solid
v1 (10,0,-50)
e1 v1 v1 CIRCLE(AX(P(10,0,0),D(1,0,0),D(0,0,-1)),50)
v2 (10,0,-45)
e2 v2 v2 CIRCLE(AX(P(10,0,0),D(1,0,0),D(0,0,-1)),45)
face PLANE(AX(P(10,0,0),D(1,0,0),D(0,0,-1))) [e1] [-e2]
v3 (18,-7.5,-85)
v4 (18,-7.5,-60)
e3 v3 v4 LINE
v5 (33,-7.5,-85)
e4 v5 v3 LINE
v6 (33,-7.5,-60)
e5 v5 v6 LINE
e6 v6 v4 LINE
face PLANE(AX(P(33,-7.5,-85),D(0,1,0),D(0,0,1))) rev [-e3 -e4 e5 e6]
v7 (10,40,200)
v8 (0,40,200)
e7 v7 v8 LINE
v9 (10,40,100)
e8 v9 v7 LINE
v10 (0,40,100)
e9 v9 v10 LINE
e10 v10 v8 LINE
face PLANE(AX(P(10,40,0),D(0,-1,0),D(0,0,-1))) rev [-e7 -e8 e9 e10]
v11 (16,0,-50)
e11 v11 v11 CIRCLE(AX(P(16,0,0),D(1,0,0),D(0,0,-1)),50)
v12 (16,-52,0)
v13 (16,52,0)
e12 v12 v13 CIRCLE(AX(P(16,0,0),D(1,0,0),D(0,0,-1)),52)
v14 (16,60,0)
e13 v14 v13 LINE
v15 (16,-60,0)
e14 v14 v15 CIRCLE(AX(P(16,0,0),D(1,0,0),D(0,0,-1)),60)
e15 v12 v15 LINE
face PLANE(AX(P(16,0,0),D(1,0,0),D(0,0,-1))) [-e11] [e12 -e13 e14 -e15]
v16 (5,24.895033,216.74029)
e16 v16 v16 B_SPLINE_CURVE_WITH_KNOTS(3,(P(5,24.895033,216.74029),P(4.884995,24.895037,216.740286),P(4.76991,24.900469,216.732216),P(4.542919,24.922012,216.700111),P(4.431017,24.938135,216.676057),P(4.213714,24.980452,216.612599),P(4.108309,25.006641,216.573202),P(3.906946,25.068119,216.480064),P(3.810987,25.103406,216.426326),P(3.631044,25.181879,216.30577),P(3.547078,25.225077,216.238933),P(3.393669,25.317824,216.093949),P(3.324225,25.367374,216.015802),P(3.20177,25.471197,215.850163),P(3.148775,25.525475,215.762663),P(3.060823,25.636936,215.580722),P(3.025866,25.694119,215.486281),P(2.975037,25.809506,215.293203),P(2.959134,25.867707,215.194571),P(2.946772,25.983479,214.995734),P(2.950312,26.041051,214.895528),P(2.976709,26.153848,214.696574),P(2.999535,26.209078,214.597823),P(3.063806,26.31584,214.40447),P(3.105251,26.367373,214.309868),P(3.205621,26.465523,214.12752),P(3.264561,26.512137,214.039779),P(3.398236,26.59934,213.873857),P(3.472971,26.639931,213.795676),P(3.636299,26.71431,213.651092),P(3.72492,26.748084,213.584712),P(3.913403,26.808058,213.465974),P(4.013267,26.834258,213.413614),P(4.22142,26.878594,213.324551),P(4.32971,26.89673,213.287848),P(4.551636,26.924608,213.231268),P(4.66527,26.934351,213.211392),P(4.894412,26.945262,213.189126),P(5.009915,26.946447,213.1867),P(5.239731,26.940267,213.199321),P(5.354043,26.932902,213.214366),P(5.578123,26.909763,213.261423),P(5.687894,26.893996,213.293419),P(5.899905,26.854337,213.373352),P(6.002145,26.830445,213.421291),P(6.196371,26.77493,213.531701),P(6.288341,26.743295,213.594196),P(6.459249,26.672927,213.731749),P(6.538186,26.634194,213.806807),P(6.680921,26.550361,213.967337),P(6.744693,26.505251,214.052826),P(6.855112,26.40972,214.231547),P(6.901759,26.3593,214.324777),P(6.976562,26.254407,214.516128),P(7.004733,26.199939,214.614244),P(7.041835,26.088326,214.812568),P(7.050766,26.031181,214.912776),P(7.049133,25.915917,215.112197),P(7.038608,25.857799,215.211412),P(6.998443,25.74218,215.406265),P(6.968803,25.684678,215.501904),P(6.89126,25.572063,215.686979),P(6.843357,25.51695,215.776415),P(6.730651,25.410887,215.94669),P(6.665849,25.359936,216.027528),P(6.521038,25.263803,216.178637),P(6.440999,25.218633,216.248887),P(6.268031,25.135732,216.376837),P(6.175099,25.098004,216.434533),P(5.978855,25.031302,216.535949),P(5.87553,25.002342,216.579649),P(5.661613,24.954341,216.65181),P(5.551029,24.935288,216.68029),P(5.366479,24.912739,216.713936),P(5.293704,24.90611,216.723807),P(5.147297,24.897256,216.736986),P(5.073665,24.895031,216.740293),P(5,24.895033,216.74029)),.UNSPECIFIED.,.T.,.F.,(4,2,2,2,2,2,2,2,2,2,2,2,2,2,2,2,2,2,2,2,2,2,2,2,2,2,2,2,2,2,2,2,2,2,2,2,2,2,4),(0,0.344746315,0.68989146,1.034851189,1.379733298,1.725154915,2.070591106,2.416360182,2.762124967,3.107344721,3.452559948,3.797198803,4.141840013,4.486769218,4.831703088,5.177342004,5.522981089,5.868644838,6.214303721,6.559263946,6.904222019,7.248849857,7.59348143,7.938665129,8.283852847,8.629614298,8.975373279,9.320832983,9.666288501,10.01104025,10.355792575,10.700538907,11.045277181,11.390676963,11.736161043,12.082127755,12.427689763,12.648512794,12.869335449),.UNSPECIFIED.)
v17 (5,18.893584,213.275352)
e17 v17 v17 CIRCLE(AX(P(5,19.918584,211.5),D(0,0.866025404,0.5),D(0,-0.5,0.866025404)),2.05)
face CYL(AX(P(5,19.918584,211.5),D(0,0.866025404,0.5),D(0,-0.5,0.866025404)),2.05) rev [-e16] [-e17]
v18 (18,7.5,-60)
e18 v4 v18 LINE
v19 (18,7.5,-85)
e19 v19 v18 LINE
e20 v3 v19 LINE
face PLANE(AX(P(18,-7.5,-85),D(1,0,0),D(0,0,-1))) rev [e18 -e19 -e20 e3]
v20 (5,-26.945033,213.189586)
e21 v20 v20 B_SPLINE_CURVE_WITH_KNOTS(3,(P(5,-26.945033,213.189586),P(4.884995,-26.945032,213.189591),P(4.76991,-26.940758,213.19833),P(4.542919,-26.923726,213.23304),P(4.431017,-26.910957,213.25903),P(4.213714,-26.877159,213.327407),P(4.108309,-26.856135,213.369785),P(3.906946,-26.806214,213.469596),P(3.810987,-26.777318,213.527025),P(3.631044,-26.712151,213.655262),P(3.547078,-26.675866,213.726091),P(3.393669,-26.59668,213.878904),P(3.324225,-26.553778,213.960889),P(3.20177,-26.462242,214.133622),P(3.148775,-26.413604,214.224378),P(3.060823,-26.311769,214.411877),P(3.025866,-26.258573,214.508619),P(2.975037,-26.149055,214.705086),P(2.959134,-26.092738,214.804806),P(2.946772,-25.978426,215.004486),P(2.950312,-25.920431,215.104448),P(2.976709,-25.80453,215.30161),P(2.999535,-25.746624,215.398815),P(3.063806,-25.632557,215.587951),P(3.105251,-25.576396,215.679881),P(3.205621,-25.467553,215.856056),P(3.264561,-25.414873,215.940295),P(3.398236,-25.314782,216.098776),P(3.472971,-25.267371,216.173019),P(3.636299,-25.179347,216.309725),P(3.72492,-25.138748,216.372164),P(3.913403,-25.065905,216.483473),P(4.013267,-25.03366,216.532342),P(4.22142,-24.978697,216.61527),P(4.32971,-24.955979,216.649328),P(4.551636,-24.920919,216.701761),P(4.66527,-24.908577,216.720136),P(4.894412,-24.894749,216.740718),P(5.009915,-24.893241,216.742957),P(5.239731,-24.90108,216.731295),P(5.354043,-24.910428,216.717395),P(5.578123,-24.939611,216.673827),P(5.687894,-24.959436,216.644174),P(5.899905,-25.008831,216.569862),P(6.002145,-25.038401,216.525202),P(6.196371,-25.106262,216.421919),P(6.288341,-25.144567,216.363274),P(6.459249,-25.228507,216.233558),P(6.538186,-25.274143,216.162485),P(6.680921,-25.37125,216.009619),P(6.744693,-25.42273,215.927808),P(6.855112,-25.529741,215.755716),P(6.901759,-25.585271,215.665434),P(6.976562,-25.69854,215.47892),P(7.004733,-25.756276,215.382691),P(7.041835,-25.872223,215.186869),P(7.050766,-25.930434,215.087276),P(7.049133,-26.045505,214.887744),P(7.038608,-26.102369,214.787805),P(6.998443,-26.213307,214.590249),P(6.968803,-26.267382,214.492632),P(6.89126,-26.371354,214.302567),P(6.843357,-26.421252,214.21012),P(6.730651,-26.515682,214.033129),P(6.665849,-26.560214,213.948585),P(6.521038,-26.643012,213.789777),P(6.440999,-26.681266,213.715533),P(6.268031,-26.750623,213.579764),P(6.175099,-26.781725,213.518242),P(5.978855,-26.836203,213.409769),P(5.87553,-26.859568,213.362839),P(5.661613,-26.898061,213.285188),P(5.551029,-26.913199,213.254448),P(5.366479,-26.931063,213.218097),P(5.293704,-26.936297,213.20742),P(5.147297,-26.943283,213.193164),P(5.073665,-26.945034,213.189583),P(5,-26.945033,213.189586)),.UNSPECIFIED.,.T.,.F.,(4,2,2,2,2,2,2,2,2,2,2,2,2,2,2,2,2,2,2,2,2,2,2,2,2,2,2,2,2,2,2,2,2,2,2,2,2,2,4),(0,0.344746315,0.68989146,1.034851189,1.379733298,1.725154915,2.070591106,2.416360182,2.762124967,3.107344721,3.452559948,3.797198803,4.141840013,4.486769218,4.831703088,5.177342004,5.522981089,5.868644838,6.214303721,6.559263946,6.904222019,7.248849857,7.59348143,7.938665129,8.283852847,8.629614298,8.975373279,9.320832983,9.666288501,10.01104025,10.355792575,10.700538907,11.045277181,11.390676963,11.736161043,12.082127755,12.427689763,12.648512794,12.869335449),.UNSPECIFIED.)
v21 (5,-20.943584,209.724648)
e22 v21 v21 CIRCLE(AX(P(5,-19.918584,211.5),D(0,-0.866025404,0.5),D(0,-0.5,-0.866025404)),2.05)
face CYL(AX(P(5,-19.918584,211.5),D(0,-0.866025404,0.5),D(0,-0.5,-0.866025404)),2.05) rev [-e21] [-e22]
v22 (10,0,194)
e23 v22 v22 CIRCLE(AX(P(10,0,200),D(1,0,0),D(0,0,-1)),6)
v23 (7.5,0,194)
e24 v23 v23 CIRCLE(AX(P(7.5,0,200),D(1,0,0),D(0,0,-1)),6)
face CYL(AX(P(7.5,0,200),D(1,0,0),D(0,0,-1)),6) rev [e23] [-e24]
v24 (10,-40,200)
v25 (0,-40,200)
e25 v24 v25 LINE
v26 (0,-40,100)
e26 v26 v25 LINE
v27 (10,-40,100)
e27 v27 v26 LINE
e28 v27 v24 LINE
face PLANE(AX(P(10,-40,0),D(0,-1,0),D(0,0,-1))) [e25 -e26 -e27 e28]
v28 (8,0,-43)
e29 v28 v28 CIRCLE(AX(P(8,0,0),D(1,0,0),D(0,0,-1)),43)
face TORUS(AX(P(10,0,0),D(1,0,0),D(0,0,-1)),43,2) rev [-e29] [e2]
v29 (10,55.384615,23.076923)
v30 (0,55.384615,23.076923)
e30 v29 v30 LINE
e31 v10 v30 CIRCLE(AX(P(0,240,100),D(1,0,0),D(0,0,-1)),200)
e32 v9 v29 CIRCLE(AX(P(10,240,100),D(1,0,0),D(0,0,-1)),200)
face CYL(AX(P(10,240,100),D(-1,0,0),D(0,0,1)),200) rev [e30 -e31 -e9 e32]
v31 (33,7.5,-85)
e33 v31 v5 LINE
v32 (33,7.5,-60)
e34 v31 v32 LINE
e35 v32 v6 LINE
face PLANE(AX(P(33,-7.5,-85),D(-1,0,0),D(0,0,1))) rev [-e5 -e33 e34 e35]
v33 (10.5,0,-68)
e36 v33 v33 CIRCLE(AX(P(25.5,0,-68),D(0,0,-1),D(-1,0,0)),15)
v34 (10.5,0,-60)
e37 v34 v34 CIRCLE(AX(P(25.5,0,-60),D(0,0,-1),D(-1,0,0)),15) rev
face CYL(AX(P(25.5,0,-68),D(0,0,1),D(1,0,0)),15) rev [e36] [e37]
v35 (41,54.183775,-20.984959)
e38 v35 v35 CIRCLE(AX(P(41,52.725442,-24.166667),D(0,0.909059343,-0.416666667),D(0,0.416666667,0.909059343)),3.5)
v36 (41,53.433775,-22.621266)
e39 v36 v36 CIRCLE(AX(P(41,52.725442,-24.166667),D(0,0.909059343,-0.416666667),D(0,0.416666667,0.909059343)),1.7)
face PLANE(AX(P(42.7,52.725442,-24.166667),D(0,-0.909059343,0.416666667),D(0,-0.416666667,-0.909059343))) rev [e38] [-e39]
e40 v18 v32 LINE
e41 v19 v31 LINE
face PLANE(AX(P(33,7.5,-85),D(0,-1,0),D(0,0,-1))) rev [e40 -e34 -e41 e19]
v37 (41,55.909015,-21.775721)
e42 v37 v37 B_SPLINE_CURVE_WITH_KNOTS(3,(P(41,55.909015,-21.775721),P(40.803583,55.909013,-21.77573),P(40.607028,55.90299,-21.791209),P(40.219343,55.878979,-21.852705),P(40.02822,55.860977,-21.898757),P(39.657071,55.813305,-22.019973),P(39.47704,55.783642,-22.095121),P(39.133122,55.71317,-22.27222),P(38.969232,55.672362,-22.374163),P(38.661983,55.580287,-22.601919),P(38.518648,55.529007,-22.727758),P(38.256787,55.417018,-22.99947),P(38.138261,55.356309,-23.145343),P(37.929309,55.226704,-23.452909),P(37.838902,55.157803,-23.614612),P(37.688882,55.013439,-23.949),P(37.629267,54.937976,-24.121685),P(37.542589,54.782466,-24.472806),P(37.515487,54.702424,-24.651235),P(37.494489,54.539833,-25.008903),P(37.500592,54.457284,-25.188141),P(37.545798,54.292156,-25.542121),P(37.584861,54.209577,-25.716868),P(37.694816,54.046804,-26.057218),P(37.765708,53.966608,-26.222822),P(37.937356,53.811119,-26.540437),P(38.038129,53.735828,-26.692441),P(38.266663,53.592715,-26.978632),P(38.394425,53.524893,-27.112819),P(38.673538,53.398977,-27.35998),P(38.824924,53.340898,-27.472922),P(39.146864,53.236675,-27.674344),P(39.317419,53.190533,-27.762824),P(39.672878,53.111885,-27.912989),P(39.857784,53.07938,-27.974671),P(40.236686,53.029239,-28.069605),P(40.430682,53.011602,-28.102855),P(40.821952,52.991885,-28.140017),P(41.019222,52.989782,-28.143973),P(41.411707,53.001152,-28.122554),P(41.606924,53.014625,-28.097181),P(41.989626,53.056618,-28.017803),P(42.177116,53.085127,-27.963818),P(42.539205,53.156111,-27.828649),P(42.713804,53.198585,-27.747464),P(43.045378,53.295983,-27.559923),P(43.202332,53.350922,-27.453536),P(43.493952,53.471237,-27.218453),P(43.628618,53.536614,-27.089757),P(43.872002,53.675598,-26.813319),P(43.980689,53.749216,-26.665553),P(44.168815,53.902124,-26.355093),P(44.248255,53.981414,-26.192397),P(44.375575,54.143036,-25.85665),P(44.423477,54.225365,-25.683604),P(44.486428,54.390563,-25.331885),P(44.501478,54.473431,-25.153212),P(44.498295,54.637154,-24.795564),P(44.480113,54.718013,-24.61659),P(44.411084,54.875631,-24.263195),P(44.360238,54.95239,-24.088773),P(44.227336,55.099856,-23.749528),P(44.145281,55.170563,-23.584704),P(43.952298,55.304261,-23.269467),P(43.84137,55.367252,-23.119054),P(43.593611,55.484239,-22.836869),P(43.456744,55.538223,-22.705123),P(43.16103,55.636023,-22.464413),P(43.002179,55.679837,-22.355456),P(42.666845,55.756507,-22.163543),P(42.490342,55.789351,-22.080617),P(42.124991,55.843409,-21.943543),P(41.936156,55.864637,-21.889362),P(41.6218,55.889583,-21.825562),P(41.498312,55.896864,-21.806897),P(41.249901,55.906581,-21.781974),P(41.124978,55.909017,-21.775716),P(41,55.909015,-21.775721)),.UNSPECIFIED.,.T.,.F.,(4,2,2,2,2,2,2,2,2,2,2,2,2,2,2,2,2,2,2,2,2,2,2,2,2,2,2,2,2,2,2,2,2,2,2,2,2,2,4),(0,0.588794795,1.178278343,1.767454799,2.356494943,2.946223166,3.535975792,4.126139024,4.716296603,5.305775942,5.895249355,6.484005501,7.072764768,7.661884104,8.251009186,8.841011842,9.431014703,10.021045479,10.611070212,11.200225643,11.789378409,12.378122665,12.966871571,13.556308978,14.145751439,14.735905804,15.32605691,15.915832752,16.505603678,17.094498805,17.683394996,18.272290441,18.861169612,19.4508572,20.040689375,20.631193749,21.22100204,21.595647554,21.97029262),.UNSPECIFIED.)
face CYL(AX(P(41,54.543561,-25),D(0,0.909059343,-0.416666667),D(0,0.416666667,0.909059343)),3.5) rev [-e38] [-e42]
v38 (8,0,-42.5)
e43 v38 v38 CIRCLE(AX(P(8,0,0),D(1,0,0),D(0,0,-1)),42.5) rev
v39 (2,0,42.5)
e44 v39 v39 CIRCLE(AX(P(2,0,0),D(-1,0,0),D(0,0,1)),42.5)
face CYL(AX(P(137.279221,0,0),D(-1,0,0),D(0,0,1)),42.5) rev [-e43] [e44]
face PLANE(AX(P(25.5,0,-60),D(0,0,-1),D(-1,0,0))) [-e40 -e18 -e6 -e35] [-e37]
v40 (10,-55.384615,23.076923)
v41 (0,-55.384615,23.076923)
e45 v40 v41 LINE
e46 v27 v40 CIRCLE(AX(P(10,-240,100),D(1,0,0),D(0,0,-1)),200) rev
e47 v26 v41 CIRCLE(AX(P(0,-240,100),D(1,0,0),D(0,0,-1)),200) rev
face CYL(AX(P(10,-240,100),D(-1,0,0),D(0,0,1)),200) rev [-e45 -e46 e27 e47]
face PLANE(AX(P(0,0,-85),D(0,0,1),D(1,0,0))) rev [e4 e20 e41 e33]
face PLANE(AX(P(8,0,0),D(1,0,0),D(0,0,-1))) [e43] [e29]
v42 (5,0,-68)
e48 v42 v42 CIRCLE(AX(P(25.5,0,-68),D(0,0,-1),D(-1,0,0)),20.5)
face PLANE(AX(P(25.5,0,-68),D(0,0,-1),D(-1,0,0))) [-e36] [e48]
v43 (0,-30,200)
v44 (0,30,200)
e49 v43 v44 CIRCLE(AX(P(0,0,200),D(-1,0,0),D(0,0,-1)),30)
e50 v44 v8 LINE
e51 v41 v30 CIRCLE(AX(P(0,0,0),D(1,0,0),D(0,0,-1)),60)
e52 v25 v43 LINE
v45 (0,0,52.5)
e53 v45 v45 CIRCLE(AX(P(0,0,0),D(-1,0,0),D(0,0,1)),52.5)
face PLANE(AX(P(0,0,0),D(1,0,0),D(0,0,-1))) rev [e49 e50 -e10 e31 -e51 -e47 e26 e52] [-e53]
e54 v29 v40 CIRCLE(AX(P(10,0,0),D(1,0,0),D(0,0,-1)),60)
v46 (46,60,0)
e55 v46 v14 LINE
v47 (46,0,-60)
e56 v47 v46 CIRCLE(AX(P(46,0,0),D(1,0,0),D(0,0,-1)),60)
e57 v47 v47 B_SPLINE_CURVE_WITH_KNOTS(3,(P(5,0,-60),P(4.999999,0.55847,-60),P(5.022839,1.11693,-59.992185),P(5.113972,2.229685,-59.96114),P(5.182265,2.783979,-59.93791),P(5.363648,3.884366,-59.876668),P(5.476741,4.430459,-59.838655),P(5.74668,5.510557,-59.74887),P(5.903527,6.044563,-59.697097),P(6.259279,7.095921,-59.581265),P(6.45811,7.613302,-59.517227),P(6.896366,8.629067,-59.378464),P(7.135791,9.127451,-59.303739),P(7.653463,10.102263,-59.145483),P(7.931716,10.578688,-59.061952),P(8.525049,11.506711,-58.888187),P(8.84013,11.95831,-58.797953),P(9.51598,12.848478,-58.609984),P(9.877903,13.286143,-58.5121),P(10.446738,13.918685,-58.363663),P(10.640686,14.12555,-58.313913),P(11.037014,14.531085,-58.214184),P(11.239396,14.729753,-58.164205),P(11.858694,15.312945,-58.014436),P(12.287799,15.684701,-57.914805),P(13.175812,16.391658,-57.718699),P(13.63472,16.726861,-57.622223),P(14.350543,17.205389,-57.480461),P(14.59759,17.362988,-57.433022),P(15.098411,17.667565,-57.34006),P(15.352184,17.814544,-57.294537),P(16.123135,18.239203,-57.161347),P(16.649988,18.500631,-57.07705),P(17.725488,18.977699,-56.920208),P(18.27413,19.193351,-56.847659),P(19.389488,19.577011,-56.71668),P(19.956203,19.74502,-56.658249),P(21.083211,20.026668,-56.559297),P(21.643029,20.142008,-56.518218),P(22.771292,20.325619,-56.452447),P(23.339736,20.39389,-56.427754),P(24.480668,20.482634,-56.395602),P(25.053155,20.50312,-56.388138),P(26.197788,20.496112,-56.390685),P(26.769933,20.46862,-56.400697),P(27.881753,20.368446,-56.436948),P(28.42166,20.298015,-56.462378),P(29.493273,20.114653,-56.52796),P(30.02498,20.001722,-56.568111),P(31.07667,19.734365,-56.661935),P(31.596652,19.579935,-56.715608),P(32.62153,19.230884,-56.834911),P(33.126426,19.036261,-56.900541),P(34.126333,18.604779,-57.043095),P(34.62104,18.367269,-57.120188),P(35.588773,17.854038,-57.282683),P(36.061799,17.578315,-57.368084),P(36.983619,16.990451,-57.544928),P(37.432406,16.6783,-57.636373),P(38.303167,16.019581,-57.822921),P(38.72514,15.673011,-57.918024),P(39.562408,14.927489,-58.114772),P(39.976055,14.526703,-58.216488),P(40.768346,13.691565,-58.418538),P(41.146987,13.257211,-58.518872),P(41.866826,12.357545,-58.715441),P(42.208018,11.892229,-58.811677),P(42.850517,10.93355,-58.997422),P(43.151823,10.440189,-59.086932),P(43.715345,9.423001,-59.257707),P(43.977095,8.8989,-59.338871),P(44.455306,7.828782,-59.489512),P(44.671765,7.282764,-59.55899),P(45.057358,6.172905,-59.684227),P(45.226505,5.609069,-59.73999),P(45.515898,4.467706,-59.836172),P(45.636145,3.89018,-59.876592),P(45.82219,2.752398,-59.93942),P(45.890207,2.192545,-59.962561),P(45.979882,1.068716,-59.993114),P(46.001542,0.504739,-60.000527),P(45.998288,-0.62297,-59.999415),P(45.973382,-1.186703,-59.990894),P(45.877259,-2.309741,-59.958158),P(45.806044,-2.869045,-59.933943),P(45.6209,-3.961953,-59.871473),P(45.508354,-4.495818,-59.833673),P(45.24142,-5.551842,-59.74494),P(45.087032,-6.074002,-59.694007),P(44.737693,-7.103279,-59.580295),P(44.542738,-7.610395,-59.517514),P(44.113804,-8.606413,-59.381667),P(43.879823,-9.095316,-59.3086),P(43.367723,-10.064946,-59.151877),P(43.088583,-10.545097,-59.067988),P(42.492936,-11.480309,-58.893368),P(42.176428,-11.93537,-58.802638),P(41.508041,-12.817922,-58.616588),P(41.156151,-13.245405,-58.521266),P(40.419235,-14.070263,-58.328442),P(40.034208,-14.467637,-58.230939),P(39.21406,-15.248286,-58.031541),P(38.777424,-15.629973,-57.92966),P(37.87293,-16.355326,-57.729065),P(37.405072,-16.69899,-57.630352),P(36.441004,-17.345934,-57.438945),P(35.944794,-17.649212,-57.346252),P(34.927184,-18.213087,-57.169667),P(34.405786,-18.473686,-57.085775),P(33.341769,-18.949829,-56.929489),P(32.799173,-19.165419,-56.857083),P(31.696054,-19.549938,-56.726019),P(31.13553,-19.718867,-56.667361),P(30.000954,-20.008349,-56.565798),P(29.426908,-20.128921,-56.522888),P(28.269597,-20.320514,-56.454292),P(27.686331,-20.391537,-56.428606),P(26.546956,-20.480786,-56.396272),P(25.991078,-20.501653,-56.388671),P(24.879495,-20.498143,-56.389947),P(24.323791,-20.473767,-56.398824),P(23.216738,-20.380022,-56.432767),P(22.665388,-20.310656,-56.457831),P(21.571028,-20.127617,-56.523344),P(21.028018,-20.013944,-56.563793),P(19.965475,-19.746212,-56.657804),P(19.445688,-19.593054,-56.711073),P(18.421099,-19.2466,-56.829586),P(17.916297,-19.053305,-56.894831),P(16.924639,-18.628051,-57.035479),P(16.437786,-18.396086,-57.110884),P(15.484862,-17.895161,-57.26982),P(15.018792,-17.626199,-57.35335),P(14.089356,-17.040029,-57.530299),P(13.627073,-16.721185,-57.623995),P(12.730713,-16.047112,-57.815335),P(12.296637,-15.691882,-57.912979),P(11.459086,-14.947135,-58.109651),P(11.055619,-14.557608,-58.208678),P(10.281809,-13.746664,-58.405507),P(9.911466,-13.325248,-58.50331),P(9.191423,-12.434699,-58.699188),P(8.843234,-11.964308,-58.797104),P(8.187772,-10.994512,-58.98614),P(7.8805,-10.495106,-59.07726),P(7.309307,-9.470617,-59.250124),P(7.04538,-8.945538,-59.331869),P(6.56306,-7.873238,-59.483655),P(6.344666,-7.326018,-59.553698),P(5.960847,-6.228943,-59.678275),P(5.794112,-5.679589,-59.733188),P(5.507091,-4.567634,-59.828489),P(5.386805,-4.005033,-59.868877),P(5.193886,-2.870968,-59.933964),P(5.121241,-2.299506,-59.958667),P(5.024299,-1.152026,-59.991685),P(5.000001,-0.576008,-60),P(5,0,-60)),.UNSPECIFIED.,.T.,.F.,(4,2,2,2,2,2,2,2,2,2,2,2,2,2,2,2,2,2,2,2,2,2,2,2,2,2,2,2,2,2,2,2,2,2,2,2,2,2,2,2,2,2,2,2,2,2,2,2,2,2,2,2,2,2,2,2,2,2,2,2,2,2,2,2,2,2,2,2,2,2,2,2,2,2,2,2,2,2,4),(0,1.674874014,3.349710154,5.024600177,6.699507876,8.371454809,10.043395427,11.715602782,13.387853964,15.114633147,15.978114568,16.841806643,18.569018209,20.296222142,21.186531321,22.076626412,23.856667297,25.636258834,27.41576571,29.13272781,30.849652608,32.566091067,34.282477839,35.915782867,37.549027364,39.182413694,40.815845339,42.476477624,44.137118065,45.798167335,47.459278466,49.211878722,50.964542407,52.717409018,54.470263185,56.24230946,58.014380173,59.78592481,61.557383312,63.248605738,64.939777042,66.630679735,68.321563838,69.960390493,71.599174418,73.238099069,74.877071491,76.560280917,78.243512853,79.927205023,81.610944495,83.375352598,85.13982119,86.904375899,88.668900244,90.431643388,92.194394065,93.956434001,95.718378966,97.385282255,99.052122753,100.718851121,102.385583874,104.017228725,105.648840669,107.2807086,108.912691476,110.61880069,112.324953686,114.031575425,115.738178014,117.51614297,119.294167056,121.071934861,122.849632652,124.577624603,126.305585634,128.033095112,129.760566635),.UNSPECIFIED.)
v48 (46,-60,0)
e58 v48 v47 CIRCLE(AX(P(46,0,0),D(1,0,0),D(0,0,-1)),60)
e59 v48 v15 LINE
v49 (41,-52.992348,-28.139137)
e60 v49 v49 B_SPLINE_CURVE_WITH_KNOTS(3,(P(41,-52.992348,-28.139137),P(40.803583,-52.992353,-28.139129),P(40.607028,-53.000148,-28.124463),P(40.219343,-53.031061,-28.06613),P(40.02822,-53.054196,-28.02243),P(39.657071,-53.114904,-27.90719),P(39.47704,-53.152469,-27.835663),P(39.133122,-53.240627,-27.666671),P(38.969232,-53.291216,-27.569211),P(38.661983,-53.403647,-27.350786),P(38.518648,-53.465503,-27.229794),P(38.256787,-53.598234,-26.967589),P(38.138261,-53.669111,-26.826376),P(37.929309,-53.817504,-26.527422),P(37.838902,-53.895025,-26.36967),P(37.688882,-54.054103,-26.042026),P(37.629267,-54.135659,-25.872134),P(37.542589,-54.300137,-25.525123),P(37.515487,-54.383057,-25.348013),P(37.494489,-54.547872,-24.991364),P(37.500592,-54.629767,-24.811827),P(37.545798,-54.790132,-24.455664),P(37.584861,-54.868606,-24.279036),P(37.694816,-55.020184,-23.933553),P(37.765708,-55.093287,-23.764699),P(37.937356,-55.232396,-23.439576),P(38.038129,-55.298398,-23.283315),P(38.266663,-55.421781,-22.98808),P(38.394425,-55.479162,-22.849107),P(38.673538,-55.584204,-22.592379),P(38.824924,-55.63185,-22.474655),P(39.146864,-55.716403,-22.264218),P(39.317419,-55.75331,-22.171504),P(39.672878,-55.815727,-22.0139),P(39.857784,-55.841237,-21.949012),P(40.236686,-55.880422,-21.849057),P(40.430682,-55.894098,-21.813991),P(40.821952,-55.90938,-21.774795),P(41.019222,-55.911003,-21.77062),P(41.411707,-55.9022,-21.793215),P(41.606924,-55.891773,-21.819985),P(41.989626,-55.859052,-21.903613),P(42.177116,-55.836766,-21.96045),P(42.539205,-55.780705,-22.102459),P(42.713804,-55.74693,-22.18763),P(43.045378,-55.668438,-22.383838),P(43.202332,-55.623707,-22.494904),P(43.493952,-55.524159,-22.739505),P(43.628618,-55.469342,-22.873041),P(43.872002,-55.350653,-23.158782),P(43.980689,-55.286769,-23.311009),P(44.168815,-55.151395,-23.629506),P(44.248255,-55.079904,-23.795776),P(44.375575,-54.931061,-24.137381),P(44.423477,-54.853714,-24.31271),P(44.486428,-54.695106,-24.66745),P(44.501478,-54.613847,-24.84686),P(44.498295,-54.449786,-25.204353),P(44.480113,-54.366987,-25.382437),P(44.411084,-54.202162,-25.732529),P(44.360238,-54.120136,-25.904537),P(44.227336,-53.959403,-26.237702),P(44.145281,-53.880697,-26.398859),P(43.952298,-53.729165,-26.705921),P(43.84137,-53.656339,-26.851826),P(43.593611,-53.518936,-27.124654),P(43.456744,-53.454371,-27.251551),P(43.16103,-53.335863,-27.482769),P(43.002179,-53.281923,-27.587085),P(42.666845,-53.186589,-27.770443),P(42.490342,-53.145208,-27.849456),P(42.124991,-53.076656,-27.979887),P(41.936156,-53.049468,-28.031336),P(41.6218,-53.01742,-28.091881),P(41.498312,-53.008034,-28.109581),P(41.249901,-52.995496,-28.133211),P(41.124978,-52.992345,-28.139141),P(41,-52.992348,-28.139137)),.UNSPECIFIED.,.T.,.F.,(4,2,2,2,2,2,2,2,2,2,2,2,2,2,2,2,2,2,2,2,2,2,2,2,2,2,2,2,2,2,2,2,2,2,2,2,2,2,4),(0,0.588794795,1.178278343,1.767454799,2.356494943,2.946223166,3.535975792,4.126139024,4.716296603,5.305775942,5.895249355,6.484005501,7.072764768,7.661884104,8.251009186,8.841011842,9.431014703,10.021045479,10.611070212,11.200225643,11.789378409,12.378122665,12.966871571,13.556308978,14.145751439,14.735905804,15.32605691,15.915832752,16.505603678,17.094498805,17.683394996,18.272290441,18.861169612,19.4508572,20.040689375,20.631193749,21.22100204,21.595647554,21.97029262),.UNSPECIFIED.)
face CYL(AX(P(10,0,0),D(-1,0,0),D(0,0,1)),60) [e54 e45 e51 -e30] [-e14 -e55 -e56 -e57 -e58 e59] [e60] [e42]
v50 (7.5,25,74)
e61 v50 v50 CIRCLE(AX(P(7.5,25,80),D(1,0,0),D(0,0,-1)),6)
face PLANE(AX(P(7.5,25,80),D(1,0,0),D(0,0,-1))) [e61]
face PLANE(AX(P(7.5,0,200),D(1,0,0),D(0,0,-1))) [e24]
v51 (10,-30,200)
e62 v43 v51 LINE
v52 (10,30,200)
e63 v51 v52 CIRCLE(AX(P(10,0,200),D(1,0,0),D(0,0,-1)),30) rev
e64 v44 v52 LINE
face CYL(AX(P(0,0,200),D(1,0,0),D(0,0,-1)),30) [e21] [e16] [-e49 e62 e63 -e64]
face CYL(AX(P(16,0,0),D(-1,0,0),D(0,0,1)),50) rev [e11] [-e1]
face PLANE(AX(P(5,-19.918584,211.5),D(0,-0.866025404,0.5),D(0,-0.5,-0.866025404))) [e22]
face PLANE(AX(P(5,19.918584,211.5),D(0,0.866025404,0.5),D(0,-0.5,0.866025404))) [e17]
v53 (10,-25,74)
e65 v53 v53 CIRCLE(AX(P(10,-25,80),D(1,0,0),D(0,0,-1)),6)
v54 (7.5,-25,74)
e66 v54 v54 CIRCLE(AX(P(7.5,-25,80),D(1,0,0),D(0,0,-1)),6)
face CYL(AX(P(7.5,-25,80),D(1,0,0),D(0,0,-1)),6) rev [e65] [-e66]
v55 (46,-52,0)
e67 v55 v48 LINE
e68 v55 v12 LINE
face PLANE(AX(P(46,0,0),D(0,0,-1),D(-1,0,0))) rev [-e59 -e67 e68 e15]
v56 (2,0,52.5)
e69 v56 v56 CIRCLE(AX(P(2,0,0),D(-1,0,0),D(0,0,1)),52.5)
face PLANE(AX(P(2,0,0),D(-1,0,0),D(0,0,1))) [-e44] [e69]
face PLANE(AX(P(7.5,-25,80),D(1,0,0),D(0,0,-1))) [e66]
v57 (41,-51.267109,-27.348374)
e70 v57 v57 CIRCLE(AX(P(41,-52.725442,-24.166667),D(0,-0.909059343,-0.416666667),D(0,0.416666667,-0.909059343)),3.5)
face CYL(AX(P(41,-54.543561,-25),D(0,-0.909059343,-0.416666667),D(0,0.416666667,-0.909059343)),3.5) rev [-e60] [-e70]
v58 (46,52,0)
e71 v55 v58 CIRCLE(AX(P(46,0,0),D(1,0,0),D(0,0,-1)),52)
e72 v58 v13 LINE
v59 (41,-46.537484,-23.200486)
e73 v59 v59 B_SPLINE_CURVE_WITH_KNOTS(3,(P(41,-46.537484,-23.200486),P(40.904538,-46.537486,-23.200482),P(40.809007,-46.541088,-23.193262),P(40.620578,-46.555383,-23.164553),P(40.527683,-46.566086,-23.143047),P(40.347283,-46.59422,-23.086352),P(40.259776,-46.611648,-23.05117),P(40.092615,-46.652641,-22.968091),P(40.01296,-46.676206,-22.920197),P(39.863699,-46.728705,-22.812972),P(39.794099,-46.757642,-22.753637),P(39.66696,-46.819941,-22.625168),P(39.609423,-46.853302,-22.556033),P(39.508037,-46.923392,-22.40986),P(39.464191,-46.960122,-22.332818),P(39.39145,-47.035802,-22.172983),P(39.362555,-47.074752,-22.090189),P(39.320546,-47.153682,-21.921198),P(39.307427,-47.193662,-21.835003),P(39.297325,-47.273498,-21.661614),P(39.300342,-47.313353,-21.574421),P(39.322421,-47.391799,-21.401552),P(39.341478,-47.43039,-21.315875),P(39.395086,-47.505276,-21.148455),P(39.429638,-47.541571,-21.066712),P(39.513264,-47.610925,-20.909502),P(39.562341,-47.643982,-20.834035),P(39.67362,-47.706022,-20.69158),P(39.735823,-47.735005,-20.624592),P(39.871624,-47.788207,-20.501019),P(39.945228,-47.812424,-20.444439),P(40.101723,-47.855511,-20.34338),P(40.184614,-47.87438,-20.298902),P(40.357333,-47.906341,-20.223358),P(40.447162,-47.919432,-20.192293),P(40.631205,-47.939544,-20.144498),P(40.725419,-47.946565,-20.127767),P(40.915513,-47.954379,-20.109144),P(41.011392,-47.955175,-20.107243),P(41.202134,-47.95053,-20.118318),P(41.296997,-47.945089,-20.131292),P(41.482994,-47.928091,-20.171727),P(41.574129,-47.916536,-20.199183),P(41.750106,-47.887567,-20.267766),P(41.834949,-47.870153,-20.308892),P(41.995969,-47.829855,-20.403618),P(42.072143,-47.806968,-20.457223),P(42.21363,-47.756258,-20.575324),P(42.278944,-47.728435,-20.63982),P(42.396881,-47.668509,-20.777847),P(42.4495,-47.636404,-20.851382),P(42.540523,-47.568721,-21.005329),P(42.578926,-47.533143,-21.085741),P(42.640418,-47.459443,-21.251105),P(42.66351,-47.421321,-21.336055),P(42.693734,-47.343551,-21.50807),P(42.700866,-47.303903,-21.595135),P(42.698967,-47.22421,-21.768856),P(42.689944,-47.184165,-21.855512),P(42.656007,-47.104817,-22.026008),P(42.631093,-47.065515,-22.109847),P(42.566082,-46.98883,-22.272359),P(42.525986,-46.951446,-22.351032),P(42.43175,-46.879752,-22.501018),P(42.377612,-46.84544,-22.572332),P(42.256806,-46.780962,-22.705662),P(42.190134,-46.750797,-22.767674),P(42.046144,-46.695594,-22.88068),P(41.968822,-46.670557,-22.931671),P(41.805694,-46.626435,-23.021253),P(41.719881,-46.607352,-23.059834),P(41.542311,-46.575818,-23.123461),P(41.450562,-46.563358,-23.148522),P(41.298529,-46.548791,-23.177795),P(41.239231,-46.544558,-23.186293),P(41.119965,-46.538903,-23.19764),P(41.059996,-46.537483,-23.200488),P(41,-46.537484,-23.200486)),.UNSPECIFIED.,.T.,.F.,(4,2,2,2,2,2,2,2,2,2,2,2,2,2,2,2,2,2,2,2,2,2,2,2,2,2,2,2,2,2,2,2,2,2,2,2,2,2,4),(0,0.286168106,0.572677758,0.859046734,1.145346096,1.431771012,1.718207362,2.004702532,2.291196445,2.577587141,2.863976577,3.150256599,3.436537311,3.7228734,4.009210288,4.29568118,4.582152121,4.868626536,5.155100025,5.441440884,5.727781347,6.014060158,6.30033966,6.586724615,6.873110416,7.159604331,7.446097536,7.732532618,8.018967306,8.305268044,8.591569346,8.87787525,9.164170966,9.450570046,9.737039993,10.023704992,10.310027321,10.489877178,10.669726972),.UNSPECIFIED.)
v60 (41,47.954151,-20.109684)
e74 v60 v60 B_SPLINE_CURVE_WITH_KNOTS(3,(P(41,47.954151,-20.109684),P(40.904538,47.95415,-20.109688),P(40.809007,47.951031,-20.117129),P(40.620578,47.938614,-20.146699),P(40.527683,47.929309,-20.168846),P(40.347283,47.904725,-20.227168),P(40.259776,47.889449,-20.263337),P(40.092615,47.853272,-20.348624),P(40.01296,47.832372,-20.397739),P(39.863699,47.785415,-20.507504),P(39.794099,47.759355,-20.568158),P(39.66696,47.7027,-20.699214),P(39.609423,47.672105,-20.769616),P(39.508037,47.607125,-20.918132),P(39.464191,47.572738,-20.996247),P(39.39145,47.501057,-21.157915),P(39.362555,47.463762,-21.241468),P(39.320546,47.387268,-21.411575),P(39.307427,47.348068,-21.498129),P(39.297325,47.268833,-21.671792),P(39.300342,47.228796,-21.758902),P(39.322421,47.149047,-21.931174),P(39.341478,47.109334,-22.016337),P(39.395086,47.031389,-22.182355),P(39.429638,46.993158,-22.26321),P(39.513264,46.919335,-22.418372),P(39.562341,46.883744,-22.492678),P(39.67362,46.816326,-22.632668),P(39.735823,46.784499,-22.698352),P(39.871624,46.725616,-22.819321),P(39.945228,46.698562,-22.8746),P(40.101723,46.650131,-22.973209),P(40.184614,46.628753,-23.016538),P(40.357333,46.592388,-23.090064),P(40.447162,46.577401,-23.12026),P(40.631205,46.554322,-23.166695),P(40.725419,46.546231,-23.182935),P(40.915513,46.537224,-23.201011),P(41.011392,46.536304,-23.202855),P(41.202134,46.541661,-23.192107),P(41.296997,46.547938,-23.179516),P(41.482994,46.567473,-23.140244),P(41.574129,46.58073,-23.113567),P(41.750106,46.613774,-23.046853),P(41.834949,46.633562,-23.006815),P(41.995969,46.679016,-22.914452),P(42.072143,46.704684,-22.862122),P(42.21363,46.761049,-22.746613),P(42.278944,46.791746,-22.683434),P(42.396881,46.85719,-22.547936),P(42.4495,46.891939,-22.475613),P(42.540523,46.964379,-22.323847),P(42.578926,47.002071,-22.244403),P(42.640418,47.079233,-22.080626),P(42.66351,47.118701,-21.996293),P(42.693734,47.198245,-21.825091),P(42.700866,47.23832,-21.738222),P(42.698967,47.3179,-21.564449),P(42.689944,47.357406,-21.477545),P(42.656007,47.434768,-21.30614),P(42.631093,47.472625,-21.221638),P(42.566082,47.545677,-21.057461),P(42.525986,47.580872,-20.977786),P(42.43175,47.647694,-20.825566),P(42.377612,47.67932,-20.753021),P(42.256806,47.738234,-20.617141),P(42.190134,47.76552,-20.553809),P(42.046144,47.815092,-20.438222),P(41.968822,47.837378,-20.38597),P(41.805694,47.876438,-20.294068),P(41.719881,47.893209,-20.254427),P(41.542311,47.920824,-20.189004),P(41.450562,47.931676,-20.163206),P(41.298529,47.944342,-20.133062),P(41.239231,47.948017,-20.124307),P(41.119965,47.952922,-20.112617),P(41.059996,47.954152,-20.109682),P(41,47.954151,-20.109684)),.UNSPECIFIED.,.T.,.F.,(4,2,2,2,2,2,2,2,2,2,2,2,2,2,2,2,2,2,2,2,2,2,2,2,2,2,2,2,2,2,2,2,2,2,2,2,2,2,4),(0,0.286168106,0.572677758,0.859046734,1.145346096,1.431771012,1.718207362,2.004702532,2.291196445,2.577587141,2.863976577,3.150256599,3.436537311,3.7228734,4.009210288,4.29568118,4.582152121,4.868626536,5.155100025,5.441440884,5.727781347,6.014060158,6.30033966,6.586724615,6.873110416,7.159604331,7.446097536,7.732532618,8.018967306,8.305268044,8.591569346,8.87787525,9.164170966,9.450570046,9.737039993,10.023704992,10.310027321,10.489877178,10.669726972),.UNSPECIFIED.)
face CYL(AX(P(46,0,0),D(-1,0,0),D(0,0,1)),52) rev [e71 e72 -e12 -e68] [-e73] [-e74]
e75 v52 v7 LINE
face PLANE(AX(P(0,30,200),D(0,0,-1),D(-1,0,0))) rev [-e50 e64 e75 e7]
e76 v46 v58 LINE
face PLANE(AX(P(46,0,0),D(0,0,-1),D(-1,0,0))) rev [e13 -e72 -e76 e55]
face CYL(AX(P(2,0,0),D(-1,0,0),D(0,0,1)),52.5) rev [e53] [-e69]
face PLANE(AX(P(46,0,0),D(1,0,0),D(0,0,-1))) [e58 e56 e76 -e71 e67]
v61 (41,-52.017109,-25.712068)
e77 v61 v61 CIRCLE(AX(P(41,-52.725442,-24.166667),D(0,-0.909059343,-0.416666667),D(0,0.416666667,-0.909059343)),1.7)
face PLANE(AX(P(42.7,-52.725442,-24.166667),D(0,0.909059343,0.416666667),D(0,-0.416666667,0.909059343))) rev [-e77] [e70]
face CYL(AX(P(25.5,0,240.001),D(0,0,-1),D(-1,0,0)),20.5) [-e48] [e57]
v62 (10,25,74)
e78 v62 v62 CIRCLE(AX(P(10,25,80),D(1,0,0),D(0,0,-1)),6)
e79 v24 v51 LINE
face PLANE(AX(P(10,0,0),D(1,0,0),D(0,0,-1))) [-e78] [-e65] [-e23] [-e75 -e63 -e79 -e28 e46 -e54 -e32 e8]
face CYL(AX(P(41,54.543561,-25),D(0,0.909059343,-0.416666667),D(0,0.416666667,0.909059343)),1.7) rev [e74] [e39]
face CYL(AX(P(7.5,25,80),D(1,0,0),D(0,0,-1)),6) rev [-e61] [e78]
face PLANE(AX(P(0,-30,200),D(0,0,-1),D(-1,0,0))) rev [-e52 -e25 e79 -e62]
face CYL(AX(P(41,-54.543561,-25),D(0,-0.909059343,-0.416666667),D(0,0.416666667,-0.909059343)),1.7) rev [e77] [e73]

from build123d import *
from build123d.topology import SkipClean

# Parameters (mm, degrees)
SKETCH1_R                                            = 60
SKETCH1_R_2                                          = 45
SKETCH1_R_3                                          = 40.00000000000001
BOSS_EXTRUDE3_DEPTH                                  = 10
SKETCH4_R                                            = 60.00000000000001
SKETCH4_R_2                                          = 50
BOSS_EXTRUDE4_DEPTH                                  = 6
SKETCH5_R                                            = 45.00000000000001
SKETCH5_R_2                                          = 42.5
BOSS_EXTRUDE5_DEPTH                                  = 8
FILLET1_R                                            = 2
SKETCH6_R                                            = 52.5
SKETCH6_R_2                                          = 42.500000000000014
CUT_EXTRUDE2_DEPTH                                   = 2
BOSS_EXTRUDE6_DEPTH                                  = 30
BOSS_EXTRUDE7_REACH                                  = 311.38
SKETCH8_R                                            = 20.5
CUT_EXTRUDE4_DEPTH                                   = 250.99199991039714
CUT_EXTRUDE4_DEPTH_BACK                              = 250.99199991039714
BOSS_EXTRUDE8_START                                  = 8
SKETCH9_R                                            = 15
BOSS_EXTRUDE8_DEPTH                                  = 8
SKETCH12_W                                           = 14.999999999999996
SKETCH12_H                                           = 15
BOSS_EXTRUDE9_DEPTH                                  = 25
CBORE_FOR_M3_HEXAGON_HEAD_BOLTS_FULL_THR_D           = 3.4
CBORE_FOR_M3_HEXAGON_HEAD_BOLTS_FULL_THR_CBORE_D     = 7
CBORE_FOR_M3_HEXAGON_HEAD_BOLTS_FULL_THR_CBORE_DEPTH = 2
CBORE_FOR_M3_HEXAGON_HEAD_BOLTS_FULL_2_D             = 3.4
CBORE_FOR_M3_HEXAGON_HEAD_BOLTS_FULL_2_CBORE_D       = 7
CBORE_FOR_M3_HEXAGON_HEAD_BOLTS_FULL_2_CBORE_DEPTH   = 2
SKETCH14_R                                           = 2.049999999999999
CUT_EXTRUDE5_DEPTH                                   = 15
SKETCH15_R                                           = 2.0499999999999985
CUT_EXTRUDE6_DEPTH                                   = 15
SKETCH16_R                                           = 6.000000000000016
CUT_EXTRUDE7_DEPTH                                   = 2.5
SKETCH17_R                                           = 6.000000000000003
CUT_EXTRUDE8_DEPTH                                   = 2.5


with BuildPart() as part:
    # Sketch1 → Boss-Extrude3 (new body)
    # profile 1 of 3: a face of its own
    with BuildSketch(Plane(origin=(0, 0, 0), x_dir=(0, 0, -1), z_dir=(1, 0, 0))):
        Circle(SKETCH1_R)
        Circle(SKETCH1_R_2, mode=Mode.SUBTRACT)
    # profile 2 of 3: a face of its own
    with BuildSketch(Plane(origin=(0, 0, 0), x_dir=(0, 0, -1), z_dir=(1, 0, 0))):
        with BuildLine():
            ThreePointArc((-23.076923076923066, 55.38461538461536), (-60.77677297236316, 43.883864861815795), (-100, 39.99999999999997))
            Line((-100, 39.999999999999986), (-200, 39.99999999999997))
            ThreePointArc((-200, 39.999999999999986), (-171.7157287525381, 28.284271247461877), (-160, -2.449e-14))
            ThreePointArc((-160, -3.429e-14), (-171.7157287525381, -28.284271247461938), (-200, -40.00000000000003))
            Line((-200, -40.00000000000003), (-100, -40.000000000000014))
            ThreePointArc((-100, -40.00000000000003), (-60.776772972363155, -43.88386486181582), (-23.07692307692308, -55.38461538461539))
            ThreePointArc((-23.0769230769231, -55.38461538461537), (-60, 7.35e-15), (-23.076923076923073, 55.38461538461539))
        make_face()
    # profile 3 of 3: a face of its own
    with BuildSketch(Plane(origin=(0, 0, 0), x_dir=(0, 0, -1), z_dir=(1, 0, 0))):
        with Locations((-200, -2.449e-14)):
            Circle(SKETCH1_R_3)
    extrude(amount=BOSS_EXTRUDE3_DEPTH)

    # Sketch4 → Boss-Extrude4 (add)
    with BuildSketch(Plane(origin=(10, 0, 0), x_dir=(0, 0, -1), z_dir=(1, 0, 0))):
        with Locations(Location((0, 0, 0), (0, 0, 112.619864948))):
            Circle(SKETCH4_R)
        Circle(SKETCH4_R_2, mode=Mode.SUBTRACT)
    extrude(amount=BOSS_EXTRUDE4_DEPTH)

    # Sketch5 → Boss-Extrude5 (add)
    with BuildSketch(Plane.ZY):
        with Locations(Location((0, 0, 0), (0, 0, 180))):
            Circle(SKETCH5_R)
        Circle(SKETCH5_R_2, mode=Mode.SUBTRACT)
    extrude(amount=-BOSS_EXTRUDE5_DEPTH)

    # Fillet1
    fillet1_edges = [part.edges().sort_by_distance(p)[0] for p in [
        (8, -1.102e-14, 45.00000000000001),
    ]]
    fillet(fillet1_edges, radius=FILLET1_R - 0.0001)  # a hair under: the kernel refuses the full size

    # Sketch6 → Cut-Extrude2 (cut)
    with BuildSketch(Plane.ZY):
        Circle(SKETCH6_R)
        Circle(SKETCH6_R_2, mode=Mode.SUBTRACT)
    extrude(amount=-CUT_EXTRUDE2_DEPTH, mode=Mode.SUBTRACT)

    # Sketch7 → Boss-Extrude6 (add)
    with BuildSketch(Plane(origin=(16, 0, 0), x_dir=(0, 0, -1), z_dir=(1, 0, 0))):
        with BuildLine():
            ThreePointArc((60.00000000000001, -1.2e-16), (42.42640687119286, 42.42640687119285), (7.35e-15, 60.000000000000014))
            Line((0, 60.00000000000001), (0, 52.000000000000014))
            ThreePointArc((5.5e-14, 52.000000000000014), (52, -2.872e-14), (-9.55e-15, -52))
            Line((0, -52), (0, -60.00000000000001))
            ThreePointArc((0, -60), (42.42640687119285, -42.42640687119285), (60.00000000000001, -1.2e-16))
        make_face()
    extrude(amount=BOSS_EXTRUDE6_DEPTH)

    # Sketch8 → Boss-Extrude7 (add, up to next)
    with BuildSketch(Plane(origin=(0, 0, -60), x_dir=(-1, 0, 0), z_dir=(0, 0, -1)), mode=Mode.PRIVATE) as boss_extrude7_sk1:
        with Locations((-25.500000000000004, -2.72e-15)):
            Circle(SKETCH8_R)
    boss_extrude7_tool1 = extrude(boss_extrude7_sk1.sketch, amount=-BOSS_EXTRUDE7_REACH, mode=Mode.PRIVATE) - part.part
    add(boss_extrude7_tool1.solids().sort_by_distance((25.5, 0, -60))[0])
    add(boss_extrude7_tool1.solids().sort_by_distance((25.5, 0, -60))[1])

    # Sketch11 → Cut-Extrude4 (cut, two sides: drawn at the far end of the back side and taken through both)
    with BuildSketch(Plane(origin=(10, 0, 0), x_dir=(0, 0, -1), z_dir=(1, 0, 0)).offset(-CUT_EXTRUDE4_DEPTH_BACK)):
        with BuildLine():
            Line((-200, 29.999999999999975), (-200, 39.99999999999997))
            ThreePointArc((-200, 39.99999999999997), (-240, -1.959e-14), (-200, -40.00000000000003))
            Line((-200, -40.00000000000003), (-200, -30.000000000000025))
            ThreePointArc((-200, -30.000000000000025), (-230, -2.082e-14), (-200, 29.999999999999975))
        make_face()
    extrude(amount=CUT_EXTRUDE4_DEPTH + CUT_EXTRUDE4_DEPTH_BACK, mode=Mode.SUBTRACT)

    # Sketch9 → Boss-Extrude8 (add)
    with SkipClean():  # the faces are left unmerged after this step: merging them gives an invalid solid
        with BuildSketch(Plane(origin=(0, 0, -60), x_dir=(-1, 0, 0), z_dir=(0, 0, -1)).offset(BOSS_EXTRUDE8_START)):
            with BuildLine():
                ThreePointArc((-5.000000000000001, 0), (-25.500000000000007, 20.5), (-46, 0))
                ThreePointArc((-46, 0), (-25.500000000000007, -20.5), (-5.000000000000001, 0))
            make_face()
            with Locations((-25.500000000000004, -2.72e-15)):
                Circle(SKETCH9_R, mode=Mode.SUBTRACT)
        extrude(amount=-BOSS_EXTRUDE8_DEPTH)

    # Sketch12 → Boss-Extrude9 (add)
    with SkipClean():  # the faces are left unmerged after this step: merging them gives an invalid solid
        with BuildSketch(Plane(origin=(0, 0, -60), x_dir=(-1, 0, 0), z_dir=(0, 0, -1))):
            with Locations((-25.5, -3.11e-15)):
                Rectangle(SKETCH12_W, SKETCH12_H)
        extrude(amount=BOSS_EXTRUDE9_DEPTH)

    # CBORE for M3 Hexagon head bolts-Full thread-grades AB1 (through all)
    with Locations(Plane(origin=(41, -54.543560573, -25), x_dir=(0, 0.416666666667, -0.909059342886), z_dir=(0, -0.909059342886, -0.416666666667))):
        with Locations((0, 0)):
            CounterBoreHole(CBORE_FOR_M3_HEXAGON_HEAD_BOLTS_FULL_THR_D / 2, CBORE_FOR_M3_HEXAGON_HEAD_BOLTS_FULL_THR_CBORE_D / 2, CBORE_FOR_M3_HEXAGON_HEAD_BOLTS_FULL_THR_CBORE_DEPTH)

    # CBORE for M3 Hexagon head bolts-Full 2 (through all)
    with Locations(Plane(origin=(41, 54.543560573, -25), x_dir=(0, 0.416667072006, 0.909059157099), z_dir=(0, 0.909059157099, -0.416667072006))):
        with Locations((0, 0)):
            CounterBoreHole(CBORE_FOR_M3_HEXAGON_HEAD_BOLTS_FULL_2_D / 2, CBORE_FOR_M3_HEXAGON_HEAD_BOLTS_FULL_2_CBORE_D / 2, CBORE_FOR_M3_HEXAGON_HEAD_BOLTS_FULL_2_CBORE_DEPTH)

    # Sketch14 → Cut-Extrude5 (cut)
    with SkipClean():  # the faces are left unmerged after this step: merging them gives an invalid solid
        with BuildSketch(Plane(origin=(0, 119.51150572225207, 68.9999999999988), x_dir=(1, 0, 0), z_dir=(0, 0.8660254037844414, 0.49999999999999517))):
            with Locations(Location((4.999999999999994, -173.20508075688855, 0), (0, 0, 270))):
                Circle(SKETCH14_R)
        extrude(amount=-CUT_EXTRUDE5_DEPTH, mode=Mode.SUBTRACT)

    # Sketch15 → Cut-Extrude6 (cut)
    with SkipClean():  # the faces are left unmerged after this step: merging them gives an invalid solid
        with BuildSketch(Plane(origin=(0, -119.5115057222521, 68.99999999999882), x_dir=(-1, 0, 0), z_dir=(0, -0.8660254037844414, 0.49999999999999517))):
            with Locations(Location((-4.999999999999994, -173.20508075688852, 0), (0, 0, 90))):
                Circle(SKETCH15_R)
        extrude(amount=-CUT_EXTRUDE6_DEPTH, mode=Mode.SUBTRACT)

    # Sketch16 → Cut-Extrude7 (cut)
    with SkipClean():  # the faces are left unmerged after this step: merging them gives an invalid solid
        with BuildSketch(Plane(origin=(10, 0, 0), x_dir=(0, 0, -1), z_dir=(1, 0, 0))):
            with Locations((-200, 0)):
                Circle(SKETCH16_R)
        extrude(amount=-CUT_EXTRUDE7_DEPTH, mode=Mode.SUBTRACT)

    # Sketch17 → Cut-Extrude8 (cut)
    with SkipClean():  # the faces are left unmerged after this step: merging them gives an invalid solid
        with BuildSketch(Plane(origin=(10, 0, 0), x_dir=(0, 0, -1), z_dir=(1, 0, 0))):
            with Locations((-80, -25)):
                Circle(SKETCH17_R)
            with Locations((-80, 25)):
                Circle(SKETCH17_R)
        extrude(amount=-CUT_EXTRUDE8_DEPTH, mode=Mode.SUBTRACT)


solid = part.part
